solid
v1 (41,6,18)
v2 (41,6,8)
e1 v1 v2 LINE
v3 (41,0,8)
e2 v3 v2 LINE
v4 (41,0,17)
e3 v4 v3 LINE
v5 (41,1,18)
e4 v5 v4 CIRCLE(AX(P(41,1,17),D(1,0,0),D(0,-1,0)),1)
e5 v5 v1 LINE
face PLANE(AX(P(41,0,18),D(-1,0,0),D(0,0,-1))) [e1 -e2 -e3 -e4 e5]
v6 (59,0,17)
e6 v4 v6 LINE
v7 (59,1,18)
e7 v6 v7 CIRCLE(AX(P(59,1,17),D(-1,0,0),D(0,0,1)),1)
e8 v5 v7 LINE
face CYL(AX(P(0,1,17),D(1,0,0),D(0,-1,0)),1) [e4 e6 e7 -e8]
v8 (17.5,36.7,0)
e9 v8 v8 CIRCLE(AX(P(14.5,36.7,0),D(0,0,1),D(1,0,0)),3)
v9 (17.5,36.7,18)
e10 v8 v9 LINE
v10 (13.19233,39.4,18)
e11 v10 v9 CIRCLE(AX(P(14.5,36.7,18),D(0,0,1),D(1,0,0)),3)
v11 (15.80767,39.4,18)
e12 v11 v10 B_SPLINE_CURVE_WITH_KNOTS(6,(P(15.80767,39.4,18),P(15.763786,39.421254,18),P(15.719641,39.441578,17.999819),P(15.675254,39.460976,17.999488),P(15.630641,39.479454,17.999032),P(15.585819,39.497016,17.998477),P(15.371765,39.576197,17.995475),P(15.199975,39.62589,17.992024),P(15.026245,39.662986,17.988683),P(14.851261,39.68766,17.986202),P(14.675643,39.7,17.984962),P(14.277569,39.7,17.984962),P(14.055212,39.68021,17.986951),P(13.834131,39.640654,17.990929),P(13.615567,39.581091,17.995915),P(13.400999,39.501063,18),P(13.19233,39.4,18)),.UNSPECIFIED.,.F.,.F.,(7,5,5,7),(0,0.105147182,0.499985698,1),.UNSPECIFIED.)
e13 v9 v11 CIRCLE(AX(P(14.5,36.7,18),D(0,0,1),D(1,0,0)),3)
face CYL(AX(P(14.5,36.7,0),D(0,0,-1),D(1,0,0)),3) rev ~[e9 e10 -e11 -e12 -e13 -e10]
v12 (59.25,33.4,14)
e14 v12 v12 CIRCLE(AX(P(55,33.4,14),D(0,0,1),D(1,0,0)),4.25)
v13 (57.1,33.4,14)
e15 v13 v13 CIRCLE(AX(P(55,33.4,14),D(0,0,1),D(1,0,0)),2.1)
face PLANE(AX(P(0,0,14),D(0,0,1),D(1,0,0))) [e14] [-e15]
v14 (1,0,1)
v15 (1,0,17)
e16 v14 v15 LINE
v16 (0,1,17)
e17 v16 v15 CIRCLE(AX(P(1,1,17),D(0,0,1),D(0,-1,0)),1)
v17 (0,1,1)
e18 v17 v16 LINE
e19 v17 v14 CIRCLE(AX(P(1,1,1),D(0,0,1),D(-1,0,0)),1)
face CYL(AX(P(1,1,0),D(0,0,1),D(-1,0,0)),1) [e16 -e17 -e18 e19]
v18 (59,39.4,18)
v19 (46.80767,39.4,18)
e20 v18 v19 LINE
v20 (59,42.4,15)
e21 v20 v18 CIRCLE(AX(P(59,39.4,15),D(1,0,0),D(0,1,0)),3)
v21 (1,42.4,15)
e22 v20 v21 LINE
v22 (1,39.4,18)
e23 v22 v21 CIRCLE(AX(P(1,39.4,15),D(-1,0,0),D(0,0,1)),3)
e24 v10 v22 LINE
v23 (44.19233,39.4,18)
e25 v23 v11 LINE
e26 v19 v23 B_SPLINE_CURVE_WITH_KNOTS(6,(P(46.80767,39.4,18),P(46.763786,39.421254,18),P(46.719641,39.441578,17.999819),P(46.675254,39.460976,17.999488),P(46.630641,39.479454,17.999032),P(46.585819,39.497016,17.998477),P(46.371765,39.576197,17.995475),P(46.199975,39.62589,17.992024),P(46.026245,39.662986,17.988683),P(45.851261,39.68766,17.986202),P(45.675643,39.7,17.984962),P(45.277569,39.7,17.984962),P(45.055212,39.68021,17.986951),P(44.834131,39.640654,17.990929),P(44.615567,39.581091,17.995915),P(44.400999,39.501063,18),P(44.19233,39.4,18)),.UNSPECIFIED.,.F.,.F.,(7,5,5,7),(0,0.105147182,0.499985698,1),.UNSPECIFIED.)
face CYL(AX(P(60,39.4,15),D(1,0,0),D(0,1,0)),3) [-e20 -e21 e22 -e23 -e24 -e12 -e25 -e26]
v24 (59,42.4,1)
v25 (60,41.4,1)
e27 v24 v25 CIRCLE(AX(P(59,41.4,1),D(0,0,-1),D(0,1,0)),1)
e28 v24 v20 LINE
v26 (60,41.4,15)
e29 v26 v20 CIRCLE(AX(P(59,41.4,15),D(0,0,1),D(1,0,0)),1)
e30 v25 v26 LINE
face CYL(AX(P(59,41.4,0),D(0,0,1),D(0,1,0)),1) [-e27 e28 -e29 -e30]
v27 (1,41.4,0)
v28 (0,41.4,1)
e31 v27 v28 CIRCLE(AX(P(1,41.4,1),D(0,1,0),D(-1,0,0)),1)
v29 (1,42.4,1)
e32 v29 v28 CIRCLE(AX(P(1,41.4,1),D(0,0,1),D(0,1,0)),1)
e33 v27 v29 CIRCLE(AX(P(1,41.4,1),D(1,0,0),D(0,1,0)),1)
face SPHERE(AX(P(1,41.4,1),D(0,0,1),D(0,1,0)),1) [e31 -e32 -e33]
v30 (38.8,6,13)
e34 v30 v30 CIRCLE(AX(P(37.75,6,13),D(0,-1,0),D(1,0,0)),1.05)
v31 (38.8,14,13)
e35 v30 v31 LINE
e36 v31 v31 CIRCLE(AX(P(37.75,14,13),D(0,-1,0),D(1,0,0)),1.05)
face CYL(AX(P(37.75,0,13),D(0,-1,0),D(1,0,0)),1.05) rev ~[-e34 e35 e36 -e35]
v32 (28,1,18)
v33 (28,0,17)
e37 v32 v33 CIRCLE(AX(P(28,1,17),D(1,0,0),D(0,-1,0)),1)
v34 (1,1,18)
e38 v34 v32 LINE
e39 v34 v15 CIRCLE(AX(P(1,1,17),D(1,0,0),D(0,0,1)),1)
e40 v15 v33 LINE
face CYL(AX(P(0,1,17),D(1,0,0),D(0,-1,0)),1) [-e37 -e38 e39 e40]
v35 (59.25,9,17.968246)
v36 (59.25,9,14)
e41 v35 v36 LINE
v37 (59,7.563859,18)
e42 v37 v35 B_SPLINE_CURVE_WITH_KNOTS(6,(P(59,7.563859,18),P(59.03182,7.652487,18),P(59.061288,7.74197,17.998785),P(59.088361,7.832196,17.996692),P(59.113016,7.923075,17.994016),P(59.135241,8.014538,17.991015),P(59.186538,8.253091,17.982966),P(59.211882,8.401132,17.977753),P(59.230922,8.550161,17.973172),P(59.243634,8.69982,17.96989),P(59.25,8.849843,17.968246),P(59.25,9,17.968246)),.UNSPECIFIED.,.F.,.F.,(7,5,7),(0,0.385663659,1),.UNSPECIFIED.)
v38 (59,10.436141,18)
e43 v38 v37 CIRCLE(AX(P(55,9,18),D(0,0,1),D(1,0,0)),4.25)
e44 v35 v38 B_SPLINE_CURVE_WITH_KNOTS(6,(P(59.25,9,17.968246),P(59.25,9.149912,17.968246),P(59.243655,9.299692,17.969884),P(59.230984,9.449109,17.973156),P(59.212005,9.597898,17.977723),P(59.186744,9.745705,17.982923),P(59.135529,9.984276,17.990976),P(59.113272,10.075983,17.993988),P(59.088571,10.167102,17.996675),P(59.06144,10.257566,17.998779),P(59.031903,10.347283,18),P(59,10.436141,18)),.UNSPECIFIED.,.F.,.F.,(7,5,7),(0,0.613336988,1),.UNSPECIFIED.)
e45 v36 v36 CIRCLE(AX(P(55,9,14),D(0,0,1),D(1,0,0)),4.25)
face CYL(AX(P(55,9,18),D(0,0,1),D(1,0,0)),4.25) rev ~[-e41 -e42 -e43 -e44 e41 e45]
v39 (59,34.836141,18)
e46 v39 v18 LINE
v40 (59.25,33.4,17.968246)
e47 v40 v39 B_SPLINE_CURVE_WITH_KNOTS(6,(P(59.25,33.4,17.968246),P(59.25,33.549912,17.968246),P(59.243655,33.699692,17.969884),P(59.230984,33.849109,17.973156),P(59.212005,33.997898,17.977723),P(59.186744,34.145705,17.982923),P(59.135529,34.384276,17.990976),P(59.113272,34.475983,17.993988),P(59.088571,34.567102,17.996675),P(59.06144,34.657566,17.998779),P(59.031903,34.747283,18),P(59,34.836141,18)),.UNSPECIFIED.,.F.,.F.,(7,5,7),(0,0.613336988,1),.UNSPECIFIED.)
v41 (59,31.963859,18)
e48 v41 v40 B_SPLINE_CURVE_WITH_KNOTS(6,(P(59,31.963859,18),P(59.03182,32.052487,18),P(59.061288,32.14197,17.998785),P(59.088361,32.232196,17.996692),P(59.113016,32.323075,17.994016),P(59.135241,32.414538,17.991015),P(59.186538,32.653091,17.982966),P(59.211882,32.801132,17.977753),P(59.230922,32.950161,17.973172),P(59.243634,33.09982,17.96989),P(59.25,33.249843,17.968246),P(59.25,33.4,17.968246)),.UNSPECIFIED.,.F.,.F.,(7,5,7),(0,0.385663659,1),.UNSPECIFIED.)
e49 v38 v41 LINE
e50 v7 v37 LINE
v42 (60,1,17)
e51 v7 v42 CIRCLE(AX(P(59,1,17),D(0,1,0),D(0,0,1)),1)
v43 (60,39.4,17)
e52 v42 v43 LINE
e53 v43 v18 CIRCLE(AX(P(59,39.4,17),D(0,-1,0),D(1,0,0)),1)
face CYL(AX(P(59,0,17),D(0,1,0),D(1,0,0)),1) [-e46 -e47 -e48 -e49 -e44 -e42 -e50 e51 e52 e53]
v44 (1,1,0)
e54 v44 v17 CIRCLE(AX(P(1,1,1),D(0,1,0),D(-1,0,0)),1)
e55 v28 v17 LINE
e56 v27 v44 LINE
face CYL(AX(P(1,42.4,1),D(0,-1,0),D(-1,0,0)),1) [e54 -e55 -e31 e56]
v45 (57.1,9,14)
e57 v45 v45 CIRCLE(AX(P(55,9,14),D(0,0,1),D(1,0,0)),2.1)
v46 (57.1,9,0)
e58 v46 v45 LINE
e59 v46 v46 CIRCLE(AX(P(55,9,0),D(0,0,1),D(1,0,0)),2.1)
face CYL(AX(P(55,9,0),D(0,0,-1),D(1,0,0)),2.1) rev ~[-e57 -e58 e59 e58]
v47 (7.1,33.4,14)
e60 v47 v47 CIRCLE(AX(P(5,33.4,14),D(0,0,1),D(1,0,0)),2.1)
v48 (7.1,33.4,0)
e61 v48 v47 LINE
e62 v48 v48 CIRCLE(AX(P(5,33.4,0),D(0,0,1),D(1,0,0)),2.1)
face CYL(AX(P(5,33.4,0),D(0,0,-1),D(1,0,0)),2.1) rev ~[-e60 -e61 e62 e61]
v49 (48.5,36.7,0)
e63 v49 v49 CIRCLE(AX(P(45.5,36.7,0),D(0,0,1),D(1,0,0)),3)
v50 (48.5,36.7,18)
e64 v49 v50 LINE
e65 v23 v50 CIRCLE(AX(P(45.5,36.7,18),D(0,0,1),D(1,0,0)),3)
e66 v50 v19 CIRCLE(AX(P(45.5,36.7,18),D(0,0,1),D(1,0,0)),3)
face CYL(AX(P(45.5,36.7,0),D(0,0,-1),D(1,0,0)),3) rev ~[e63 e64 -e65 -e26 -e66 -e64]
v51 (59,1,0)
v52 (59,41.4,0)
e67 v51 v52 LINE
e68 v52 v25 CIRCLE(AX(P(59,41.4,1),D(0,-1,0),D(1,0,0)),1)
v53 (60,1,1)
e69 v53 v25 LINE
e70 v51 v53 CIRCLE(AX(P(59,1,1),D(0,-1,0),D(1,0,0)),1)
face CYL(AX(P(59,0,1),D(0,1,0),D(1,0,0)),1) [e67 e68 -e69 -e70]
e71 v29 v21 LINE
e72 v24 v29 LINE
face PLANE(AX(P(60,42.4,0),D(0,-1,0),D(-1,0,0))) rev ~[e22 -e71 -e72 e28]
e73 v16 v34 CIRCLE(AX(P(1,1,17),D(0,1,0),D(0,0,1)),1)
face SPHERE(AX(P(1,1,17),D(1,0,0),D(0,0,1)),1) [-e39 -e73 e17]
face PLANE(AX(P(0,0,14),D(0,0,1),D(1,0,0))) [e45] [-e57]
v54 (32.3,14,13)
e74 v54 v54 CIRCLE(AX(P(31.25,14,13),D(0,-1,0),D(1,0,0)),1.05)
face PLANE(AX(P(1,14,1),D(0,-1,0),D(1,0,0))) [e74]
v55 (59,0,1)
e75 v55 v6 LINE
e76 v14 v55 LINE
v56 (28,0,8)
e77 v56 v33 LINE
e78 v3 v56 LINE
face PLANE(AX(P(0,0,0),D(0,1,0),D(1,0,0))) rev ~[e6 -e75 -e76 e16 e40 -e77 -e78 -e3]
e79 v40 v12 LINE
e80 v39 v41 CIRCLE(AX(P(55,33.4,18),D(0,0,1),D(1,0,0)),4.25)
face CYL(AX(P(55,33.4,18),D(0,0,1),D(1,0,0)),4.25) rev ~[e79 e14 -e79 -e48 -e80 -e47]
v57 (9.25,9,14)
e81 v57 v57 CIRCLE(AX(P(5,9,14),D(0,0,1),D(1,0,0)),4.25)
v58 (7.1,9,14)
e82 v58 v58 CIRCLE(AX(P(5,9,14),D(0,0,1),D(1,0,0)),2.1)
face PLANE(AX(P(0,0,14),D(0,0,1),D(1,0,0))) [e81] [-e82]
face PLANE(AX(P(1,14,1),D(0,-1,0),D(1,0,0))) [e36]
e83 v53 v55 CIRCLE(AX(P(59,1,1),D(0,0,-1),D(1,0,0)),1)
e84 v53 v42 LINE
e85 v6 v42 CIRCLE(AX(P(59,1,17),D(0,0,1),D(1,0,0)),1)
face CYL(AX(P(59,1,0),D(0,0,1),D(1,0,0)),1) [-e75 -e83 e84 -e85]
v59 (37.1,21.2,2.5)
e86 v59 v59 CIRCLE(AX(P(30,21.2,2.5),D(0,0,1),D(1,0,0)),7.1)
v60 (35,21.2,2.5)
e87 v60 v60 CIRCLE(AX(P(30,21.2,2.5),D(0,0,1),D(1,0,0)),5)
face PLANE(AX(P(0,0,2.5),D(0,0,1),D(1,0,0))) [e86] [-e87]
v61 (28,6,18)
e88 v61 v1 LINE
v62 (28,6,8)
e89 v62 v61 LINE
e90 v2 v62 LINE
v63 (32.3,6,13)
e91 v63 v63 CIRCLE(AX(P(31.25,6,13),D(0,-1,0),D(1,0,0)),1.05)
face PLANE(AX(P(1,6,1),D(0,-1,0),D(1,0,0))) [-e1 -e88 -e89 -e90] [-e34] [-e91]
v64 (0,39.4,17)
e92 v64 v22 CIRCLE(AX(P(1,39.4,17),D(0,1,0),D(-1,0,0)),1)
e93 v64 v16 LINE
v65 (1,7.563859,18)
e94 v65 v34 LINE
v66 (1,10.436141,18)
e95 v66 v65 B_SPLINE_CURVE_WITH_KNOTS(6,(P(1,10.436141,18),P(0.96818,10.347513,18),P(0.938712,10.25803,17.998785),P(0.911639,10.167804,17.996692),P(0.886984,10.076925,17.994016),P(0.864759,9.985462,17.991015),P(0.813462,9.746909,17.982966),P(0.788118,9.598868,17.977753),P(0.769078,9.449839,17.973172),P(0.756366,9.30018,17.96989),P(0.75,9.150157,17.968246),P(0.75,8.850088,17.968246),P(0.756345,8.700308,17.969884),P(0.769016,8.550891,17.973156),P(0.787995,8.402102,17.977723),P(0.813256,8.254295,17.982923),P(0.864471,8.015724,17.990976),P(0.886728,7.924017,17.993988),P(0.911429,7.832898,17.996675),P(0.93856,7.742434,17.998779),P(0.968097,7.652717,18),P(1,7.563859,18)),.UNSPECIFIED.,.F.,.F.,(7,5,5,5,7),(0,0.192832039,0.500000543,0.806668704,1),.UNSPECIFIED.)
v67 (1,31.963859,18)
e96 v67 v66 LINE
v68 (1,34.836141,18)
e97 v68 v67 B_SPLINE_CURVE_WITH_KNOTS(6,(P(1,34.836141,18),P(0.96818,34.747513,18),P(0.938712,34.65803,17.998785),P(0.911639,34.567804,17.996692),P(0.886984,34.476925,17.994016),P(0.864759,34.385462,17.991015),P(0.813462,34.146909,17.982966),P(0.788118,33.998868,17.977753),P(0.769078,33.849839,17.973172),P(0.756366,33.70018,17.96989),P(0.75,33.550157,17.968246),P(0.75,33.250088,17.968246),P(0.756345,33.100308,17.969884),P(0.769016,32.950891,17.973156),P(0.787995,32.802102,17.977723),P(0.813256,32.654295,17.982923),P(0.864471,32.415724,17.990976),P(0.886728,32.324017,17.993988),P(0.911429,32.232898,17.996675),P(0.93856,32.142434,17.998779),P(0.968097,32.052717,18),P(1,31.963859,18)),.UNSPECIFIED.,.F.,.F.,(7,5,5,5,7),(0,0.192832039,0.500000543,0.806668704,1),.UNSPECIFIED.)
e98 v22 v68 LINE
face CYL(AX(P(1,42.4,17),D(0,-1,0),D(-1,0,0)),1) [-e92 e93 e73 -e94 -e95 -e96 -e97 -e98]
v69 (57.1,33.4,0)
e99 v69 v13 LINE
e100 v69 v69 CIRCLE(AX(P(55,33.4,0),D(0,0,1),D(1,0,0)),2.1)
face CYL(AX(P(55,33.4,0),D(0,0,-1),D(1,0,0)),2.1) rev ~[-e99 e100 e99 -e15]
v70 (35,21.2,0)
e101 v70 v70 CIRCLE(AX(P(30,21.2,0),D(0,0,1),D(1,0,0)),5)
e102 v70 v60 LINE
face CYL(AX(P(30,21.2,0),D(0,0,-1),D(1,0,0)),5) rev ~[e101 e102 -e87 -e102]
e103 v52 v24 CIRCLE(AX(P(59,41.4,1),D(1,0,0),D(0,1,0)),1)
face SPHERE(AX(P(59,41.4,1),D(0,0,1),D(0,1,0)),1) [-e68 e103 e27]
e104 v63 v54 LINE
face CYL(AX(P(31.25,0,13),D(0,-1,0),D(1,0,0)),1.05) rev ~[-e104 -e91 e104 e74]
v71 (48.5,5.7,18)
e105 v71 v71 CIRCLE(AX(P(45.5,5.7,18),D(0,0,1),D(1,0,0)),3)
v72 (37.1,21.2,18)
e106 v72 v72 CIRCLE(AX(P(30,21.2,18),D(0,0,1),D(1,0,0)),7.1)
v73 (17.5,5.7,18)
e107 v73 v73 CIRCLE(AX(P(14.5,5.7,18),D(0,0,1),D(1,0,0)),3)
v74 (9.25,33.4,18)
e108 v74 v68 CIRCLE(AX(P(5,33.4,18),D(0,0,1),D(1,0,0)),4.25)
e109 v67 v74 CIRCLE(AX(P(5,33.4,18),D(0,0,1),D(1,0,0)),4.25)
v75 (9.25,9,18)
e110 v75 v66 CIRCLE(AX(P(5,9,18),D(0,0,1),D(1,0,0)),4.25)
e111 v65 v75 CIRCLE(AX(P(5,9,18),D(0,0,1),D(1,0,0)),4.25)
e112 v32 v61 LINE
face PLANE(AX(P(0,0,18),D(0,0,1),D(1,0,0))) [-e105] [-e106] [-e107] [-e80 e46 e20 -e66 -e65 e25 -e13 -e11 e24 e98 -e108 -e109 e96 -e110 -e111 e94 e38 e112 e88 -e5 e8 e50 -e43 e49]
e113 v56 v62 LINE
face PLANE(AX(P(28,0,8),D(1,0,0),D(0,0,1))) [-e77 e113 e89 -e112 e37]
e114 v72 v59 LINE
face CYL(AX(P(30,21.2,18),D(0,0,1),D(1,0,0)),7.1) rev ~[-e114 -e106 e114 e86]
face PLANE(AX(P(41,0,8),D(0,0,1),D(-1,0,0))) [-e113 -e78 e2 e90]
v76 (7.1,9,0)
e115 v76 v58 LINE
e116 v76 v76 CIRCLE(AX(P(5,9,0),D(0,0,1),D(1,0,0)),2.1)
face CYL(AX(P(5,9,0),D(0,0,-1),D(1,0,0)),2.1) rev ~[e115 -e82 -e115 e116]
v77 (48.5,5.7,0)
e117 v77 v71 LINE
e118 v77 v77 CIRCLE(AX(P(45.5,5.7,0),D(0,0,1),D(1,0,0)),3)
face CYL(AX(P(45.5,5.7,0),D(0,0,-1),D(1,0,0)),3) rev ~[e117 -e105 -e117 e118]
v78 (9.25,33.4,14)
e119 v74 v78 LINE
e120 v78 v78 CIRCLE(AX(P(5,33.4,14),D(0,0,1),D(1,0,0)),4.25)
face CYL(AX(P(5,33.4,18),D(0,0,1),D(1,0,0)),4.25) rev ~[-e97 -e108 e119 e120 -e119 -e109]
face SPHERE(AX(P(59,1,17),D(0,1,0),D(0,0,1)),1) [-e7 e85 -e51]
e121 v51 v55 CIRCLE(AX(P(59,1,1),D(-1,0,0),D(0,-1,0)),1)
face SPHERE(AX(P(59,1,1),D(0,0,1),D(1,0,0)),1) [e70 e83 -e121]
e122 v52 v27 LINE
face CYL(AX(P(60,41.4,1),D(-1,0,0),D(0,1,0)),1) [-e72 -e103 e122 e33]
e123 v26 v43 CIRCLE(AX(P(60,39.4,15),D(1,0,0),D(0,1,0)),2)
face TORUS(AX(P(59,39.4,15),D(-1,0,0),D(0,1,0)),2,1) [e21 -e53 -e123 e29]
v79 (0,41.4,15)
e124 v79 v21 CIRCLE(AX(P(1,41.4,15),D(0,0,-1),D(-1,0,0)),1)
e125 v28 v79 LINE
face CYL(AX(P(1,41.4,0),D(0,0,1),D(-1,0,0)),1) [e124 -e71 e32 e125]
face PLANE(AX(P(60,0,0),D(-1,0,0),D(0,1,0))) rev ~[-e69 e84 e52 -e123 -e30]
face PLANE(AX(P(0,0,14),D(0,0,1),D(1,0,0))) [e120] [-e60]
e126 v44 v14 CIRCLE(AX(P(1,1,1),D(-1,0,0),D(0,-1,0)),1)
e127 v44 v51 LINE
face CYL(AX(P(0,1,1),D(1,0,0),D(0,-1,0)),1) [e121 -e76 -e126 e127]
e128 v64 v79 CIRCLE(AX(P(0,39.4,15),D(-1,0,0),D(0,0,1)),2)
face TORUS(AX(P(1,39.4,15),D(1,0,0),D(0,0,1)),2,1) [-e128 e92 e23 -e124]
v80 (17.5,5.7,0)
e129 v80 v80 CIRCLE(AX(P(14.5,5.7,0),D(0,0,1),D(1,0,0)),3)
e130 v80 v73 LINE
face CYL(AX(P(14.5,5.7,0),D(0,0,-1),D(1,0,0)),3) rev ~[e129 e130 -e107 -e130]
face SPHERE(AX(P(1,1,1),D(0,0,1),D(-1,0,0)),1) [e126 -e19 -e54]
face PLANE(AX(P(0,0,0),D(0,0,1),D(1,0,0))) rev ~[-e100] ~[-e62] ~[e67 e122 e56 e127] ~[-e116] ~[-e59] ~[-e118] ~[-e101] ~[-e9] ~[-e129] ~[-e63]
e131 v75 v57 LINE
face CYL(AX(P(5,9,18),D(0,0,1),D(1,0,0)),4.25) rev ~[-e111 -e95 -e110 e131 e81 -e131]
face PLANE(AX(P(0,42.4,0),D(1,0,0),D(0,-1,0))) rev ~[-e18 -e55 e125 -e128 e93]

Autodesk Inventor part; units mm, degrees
ref_plane "YZ Plane" through (0, 0, 0) normal (1, 0, 0) x (0, 1, 0)
ref_plane "XZ Plane" through (0, 0, 0) normal (0, 1, 0) x (-1, 0, 0)
ref_plane "XY Plane" through (0, 0, 0) normal (0, 0, 1) x (1, 0, 0)
sketch "Sketch1" plane through (0, 0, 0) normal (0, 0, 1) x (1, 0, 0)
  line L0 (0, 0) -> (60, 0)
  line L1 (60, 0) -> (60, 42.4)
  line L2 (60, 42.4) -> (0, 42.4)
  line L3 (0, 42.4) -> (0, 0)
  circle A0 centre (5, 33.4) radius 2.1
  circle A1 centre (55, 33.4) radius 2.1
  circle A2 centre (55, 9) radius 2.1
  circle A3 centre (5, 9) radius 2.1
  circle A4 centre (30, 21.2) radius 5
  circle A5 centre (14.5, 36.7) radius 3
  circle A6 centre (45.5, 36.7) radius 3
  circle A7 centre (45.5, 5.7) radius 3
  circle A8 centre (14.5, 5.7) radius 3
  dimension "d0" = 42.4
  dimension "d1" = 60
  dimension "d2" = 10
  dimension "d3" = 4.2
  dimension "d4" = 24.4
  dimension "d5" = 50
  dimension "d6" = 9
  dimension "d7" = 5
  dimension "d8" = 6
  dimension "d9" = 31
  dimension "d10" = 31
  dimension "d11" = 5.7
  dimension "d12" = 14.5
  dimension "d13" = 30
  dimension "d14" = 21.2
extrude "Extrusion1" add sketch "Sketch1" along normal blind 18
fillet "Fillet1" radius 1 11 edges at (0, 42.4, 9) (60, 42.4, 9) (30, 42.4, 0) (60, 21.2, 18) (30, 0, 18) (0, 21.2, 18) (0, 0, 9) (0, 21.2, 0) (60, 0, 9) (60, 21.2, 0) (30, 0, 0)
fillet "Fillet2" radius 3 3 edges at (30, 42.4, 18) (59.7071, 42.1071, 17.7071) (0.2929, 42.1071, 17.7071)
sketch "Sketch2" plane through (0, 0, 18) normal (0, 0, 1) x (1, 0, 0)
  circle A0 centre (5, 33.4) radius 2.1 projected
  circle A1 centre (55, 33.4) radius 2.1 projected
  circle A2 centre (55, 9) radius 2.1 projected
  circle A3 centre (5, 9) radius 2.1 projected
  circle A4 centre (5, 33.4) radius 4.25
  circle A5 centre (55, 33.4) radius 4.25
  circle A6 centre (55, 9) radius 4.25
  circle A7 centre (5, 9) radius 4.25
  point P0 (0, 0)
  dimension "d19" = 8.5
extrude "Extrusion2" cut sketch "Sketch2" against normal blind 4
sketch "Sketch3" plane through (1, 0, 1) normal (0, -1, 0) x (1, 0, 0)
  line L0 (27, 17) -> (40, 17)
  line L1 (40, 17) -> (40, 7)
  line L2 (40, 7) -> (27, 7)
  line L3 (27, 7) -> (27, 17)
  line L4 (58, 17) -> (0, 17) projected
  line L5 (59, 0) -> (59, 16) projected
  point P0 (-1, -1)
  dimension "d22" = 19
  dimension "d23" = 13
  dimension "d24" = 10
extrude "Extrusion3" cut sketch "Sketch3" against normal blind 6
sketch "Sketch4" plane through (1, 0, 1) normal (0, -1, 0) x (1, 0, 0)
  line L0 (27, 7) -> (27, 16) projected
  circle A0 centre (30.25, 12) radius 1.05
  circle A1 centre (36.75, 12) radius 1.05
  line L1 (27, 17) -> (0, 17) projected
  point P0 (-1, -1)
  dimension "d27" = 2.1
  dimension "d28" = 5
  dimension "d29" = 6.5
  dimension "d30" = 3.25
extrude "Extrusion4" cut sketch "Sketch4" against normal blind 14
sketch "Sketch5" plane through (0, 0, 18) normal (0, 0, 1) x (1, 0, 0)
  circle A0 centre (30, 21.2) radius 5 projected
  circle A1 centre (30, 21.2) radius 7.1
  point P0 (0, 0)
  dimension "d33" = 14.2
extrude "Extrusion5" cut sketch "Sketch5" against normal blind 15.5
equation "\"d6\" = -0.5 * d4 + 0.5 * d0"
equation "\"d7\" = -0.5 * d5 + 0.5 * d1"
equation "\"d11\" = -0.5 * d10 + 0.5 * d0"
equation "\"d12\" = -0.5 * d9 + 0.5 * d1"
equation "\"d13\" = 0.5 * d1"
equation "\"d14\" = 0.5 * d0"
properties part number "V5 Z Top bearing"
